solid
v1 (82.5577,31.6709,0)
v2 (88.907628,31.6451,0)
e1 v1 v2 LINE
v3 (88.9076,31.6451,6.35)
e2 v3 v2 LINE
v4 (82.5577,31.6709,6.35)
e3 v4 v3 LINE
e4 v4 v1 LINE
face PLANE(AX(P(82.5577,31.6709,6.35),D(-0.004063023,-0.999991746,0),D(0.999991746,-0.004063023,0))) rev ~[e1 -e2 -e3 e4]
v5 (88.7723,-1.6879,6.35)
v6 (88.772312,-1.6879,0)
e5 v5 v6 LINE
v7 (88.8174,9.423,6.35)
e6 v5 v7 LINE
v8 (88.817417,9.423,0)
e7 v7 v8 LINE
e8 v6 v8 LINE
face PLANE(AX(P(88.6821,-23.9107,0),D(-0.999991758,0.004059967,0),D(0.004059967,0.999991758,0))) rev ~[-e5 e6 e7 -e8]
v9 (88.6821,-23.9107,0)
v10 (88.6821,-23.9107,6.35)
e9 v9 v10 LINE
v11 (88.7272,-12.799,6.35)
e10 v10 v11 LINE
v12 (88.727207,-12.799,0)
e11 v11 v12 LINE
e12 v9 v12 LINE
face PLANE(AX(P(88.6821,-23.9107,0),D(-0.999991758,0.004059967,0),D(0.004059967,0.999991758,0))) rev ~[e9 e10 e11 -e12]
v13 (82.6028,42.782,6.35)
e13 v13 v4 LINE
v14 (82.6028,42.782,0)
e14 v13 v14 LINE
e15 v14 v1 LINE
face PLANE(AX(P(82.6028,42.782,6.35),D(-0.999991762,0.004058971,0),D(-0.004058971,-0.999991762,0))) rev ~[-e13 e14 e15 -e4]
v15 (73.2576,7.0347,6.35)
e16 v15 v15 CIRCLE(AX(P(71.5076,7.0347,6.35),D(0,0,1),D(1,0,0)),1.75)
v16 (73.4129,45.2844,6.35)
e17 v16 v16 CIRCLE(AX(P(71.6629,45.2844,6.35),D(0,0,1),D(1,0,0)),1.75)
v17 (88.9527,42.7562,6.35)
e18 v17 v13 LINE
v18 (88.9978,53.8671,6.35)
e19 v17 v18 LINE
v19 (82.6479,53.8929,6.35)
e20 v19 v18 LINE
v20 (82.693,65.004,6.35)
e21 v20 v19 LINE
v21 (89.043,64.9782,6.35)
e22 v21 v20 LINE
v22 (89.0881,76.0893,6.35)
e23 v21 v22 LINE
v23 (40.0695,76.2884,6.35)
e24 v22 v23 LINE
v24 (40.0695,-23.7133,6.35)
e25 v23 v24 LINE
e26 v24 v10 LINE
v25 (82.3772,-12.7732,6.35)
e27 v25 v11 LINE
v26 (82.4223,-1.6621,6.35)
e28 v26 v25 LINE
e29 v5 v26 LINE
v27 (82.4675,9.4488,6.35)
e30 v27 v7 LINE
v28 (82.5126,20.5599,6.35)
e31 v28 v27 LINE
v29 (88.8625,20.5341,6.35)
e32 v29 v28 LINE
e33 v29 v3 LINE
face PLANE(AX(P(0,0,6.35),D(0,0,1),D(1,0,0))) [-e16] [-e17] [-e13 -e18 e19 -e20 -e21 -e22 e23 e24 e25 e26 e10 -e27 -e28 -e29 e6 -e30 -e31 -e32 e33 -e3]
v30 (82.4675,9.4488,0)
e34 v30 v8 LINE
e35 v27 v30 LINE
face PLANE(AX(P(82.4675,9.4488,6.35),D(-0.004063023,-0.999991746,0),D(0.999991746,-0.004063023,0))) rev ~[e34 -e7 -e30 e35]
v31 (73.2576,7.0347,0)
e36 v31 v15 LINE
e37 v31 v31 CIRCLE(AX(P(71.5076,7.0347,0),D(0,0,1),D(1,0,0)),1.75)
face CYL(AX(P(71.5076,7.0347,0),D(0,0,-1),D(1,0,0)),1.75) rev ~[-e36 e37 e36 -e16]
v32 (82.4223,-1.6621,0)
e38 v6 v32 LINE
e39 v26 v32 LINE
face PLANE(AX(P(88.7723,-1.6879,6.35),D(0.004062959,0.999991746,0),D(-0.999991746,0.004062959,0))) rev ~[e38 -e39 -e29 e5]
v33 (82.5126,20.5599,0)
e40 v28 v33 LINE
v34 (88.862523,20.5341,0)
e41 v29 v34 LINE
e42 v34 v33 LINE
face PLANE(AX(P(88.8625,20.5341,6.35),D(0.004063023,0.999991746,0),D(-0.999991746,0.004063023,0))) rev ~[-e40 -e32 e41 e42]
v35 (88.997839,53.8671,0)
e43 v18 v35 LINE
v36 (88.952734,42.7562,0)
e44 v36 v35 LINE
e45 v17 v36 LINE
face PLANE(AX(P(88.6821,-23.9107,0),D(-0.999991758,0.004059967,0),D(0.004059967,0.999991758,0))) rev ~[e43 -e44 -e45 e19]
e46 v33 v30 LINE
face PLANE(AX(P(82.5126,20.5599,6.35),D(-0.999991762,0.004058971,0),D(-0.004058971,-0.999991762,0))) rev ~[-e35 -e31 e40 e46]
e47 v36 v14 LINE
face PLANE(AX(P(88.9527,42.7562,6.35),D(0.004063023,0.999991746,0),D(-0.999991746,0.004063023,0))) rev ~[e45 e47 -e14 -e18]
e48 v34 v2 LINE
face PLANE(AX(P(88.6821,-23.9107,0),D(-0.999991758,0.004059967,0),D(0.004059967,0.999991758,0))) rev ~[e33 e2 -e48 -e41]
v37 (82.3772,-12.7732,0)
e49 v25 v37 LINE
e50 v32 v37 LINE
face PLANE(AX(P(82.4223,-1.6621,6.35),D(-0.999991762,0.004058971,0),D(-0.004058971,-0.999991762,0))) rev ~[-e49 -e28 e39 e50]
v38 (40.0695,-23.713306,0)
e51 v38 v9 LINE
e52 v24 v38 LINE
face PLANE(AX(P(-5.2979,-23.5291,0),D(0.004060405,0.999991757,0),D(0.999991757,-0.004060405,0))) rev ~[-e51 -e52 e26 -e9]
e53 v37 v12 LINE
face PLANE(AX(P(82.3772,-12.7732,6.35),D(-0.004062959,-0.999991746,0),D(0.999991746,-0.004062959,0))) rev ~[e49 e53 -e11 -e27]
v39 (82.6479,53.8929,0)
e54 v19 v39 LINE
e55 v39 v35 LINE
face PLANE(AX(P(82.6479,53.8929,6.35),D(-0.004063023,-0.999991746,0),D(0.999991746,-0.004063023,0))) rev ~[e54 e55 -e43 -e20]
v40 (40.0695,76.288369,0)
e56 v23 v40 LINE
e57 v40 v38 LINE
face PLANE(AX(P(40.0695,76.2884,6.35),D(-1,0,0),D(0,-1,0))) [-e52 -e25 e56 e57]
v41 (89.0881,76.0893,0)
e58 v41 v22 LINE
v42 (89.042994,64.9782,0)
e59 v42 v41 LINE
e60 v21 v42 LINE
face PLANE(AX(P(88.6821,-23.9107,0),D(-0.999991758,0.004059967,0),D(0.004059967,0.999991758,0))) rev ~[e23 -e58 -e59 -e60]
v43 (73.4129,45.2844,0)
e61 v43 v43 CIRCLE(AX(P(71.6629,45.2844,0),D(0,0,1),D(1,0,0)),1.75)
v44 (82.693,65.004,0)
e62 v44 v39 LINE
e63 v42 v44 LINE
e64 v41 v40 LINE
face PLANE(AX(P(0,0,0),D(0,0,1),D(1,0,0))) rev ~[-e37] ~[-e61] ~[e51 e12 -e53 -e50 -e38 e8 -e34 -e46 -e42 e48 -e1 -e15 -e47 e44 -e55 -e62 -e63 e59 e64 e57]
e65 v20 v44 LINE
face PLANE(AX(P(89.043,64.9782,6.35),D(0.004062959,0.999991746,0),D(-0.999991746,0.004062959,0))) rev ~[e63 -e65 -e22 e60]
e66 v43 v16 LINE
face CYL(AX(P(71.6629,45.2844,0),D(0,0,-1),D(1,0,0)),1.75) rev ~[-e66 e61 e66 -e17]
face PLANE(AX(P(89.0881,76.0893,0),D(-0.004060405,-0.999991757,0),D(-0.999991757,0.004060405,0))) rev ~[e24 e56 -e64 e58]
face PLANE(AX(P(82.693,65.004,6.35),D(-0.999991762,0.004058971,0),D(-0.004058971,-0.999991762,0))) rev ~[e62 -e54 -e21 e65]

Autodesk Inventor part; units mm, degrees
ref_plane "YZ Plane" through (0, 0, 0) normal (1, 0, 0) x (0, 1, 0)
ref_plane "XZ Plane" through (0, 0, 0) normal (0, 1, 0) x (-1, 0, 0)
ref_plane "XY Plane" through (0, 0, 0) normal (0, 0, 1) x (1, 0, 0)
sketch "Sketch1" plane through (0, 0, 0) normal (0, 0, 1) x (1, 0, 0)
  line L0 (-5.2979, -23.5291) -> (88.6821, -23.9107)
  line L1 (88.6821, -23.9107) -> (89.0881, 76.0893)
  line L2 (89.0881, 76.0893) -> (-4.8919, 76.4709)
  line L3 (-4.8919, 76.4709) -> (-5.2979, -23.5291)
  line L4 (-5.2979, -23.5291) -> (2.9514, -23.54) construction
  circle A0 centre (26.5572, 26.3424) radius 11 construction
  circle A1 centre (41.9941, 10.7796) radius 1.5 construction
  circle A2 centre (10.9944, 10.9055) radius 1.5 construction
  circle A3 centre (11.1202, 41.9052) radius 1.5 construction
  circle A4 centre (42.12, 41.7793) radius 1.5 construction
  circle A5 centre (0.2148, 52.8996) radius 1.4224 construction
  circle A6 centre (0, 0) radius 1.4224 construction
  circle A7 centre (52.8996, -0.2148) radius 1.4224 construction
  circle A8 centre (53.1143, 52.6848) radius 1.4224 construction
  line L5 (-5.3215, -5.2784) -> (58.178, -5.5363) construction
  line L6 (58.178, -5.5363) -> (58.4358, 57.9632) construction
  line L7 (58.4358, 57.9632) -> (-5.0637, 58.221) construction
  line L8 (-5.0637, 58.221) -> (-5.3215, -5.2784) construction
  line L9 (63.369, -2.4573) -> (82.4189, -2.5346) construction
  circle A9 centre (71.5076, 7.0347) radius 1.75
  circle A10 centre (71.6629, 45.2844) radius 1.75
  circle A11 centre (71.6629, 45.2844) radius 1.75 construction
  circle A12 centre (71.5076, 7.0347) radius 1.75 construction
  point P0 (88.9156, 66.1637)
  dimension "d7" = 100
  dimension "d8" = 93.98
  dimension "d38" = 3.5
extrude "Extrusion1" add sketch "Sketch1" along normal blind 6.35
sketch "Sketch2" plane through (0, 0, 6.35) normal (0, 0, 1) x (1, 0, 0)
  circle A0 centre (0.0605, -0.0094) radius 1.4214 construction
  circle A1 centre (52.924, -0.224) radius 1.4214 construction
  circle A2 centre (53.1386, 52.6394) radius 1.4214 construction
  circle A3 centre (0.2751, 52.8541) radius 1.4214 construction
  line L0 (-5.2979, -23.5291) -> (88.6821, -23.9107) construction
  line L1 (89.0881, 76.0893) -> (-4.8919, 76.4709) construction
  line L2 (-4.8919, 76.4709) -> (-5.2979, -23.5291) construction
  line L3 (89.0881, 76.0893) -> (89.043, 64.9782)
  line L4 (89.043, 64.9782) -> (82.693, 65.004)
  line L5 (82.693, 65.004) -> (82.6479, 53.8929)
  line L6 (82.6479, 53.8929) -> (88.9978, 53.8671)
  line L7 (89.043, 64.9782) -> (88.9978, 53.8671)
  line L8 (88.9979, 53.8673) -> (88.9527, 42.7562)
  line L9 (88.9527, 42.7562) -> (82.6028, 42.782)
  line L10 (82.6028, 42.782) -> (82.5577, 31.6709)
  line L11 (82.5577, 31.6709) -> (88.9076, 31.6451)
  line L12 (88.9527, 42.7562) -> (88.9076, 31.6451)
  line L13 (88.9076, 31.6453) -> (88.8625, 20.5341)
  line L14 (88.8625, 20.5341) -> (82.5126, 20.5599)
  line L15 (82.5126, 20.5599) -> (82.4675, 9.4488)
  line L16 (82.4675, 9.4488) -> (88.8174, 9.423)
  line L17 (88.8625, 20.5341) -> (88.8174, 9.423)
  line L18 (88.8174, 9.4232) -> (88.7723, -1.6879)
  line L19 (88.7723, -1.6879) -> (82.4223, -1.6621)
  line L20 (82.4223, -1.6621) -> (82.3772, -12.7732)
  line L21 (82.3772, -12.7732) -> (88.7272, -12.799)
  line L22 (88.7723, -1.6879) -> (88.7272, -12.799)
  point P0 (0, 0)
  dimension "d12" = 6.35
  dimension "d14" = 11.1111
  dimension "d31" = 22.2222
extrude "Extrusion2" cut sketch "Sketch2" against normal blind 25.4
sketch "Sketch3" plane through (0, 0, 6.35) normal (0, 0, 1) x (1, 0, 0)
  line L0 (89.0881, 76.0893) -> (-4.8919, 76.4709) construction
  line L1 (-4.8919, 76.4709) -> (-5.2979, -23.5291) construction
  line L2 (-5.2979, -23.5291) -> (88.6821, -23.9107) construction
  line L3 (89.0881, 76.0893) -> (-4.8919, 76.4709) projected
  line L4 (40.0695, 76.2884) -> (40.0695, -23.7133)
  line L5 (-5.2979, -23.5291) -> (88.6821, -23.9107) projected
  line L6 (-4.8919, 76.4709) -> (-5.2979, -23.5291)
  point P0 (0, 0)
extrude "Extrusion3" cut sketch "Sketch3" against normal blind 25.4
equation "\"d14\" = d11"
equation "\"d11\" = 11.111111"
